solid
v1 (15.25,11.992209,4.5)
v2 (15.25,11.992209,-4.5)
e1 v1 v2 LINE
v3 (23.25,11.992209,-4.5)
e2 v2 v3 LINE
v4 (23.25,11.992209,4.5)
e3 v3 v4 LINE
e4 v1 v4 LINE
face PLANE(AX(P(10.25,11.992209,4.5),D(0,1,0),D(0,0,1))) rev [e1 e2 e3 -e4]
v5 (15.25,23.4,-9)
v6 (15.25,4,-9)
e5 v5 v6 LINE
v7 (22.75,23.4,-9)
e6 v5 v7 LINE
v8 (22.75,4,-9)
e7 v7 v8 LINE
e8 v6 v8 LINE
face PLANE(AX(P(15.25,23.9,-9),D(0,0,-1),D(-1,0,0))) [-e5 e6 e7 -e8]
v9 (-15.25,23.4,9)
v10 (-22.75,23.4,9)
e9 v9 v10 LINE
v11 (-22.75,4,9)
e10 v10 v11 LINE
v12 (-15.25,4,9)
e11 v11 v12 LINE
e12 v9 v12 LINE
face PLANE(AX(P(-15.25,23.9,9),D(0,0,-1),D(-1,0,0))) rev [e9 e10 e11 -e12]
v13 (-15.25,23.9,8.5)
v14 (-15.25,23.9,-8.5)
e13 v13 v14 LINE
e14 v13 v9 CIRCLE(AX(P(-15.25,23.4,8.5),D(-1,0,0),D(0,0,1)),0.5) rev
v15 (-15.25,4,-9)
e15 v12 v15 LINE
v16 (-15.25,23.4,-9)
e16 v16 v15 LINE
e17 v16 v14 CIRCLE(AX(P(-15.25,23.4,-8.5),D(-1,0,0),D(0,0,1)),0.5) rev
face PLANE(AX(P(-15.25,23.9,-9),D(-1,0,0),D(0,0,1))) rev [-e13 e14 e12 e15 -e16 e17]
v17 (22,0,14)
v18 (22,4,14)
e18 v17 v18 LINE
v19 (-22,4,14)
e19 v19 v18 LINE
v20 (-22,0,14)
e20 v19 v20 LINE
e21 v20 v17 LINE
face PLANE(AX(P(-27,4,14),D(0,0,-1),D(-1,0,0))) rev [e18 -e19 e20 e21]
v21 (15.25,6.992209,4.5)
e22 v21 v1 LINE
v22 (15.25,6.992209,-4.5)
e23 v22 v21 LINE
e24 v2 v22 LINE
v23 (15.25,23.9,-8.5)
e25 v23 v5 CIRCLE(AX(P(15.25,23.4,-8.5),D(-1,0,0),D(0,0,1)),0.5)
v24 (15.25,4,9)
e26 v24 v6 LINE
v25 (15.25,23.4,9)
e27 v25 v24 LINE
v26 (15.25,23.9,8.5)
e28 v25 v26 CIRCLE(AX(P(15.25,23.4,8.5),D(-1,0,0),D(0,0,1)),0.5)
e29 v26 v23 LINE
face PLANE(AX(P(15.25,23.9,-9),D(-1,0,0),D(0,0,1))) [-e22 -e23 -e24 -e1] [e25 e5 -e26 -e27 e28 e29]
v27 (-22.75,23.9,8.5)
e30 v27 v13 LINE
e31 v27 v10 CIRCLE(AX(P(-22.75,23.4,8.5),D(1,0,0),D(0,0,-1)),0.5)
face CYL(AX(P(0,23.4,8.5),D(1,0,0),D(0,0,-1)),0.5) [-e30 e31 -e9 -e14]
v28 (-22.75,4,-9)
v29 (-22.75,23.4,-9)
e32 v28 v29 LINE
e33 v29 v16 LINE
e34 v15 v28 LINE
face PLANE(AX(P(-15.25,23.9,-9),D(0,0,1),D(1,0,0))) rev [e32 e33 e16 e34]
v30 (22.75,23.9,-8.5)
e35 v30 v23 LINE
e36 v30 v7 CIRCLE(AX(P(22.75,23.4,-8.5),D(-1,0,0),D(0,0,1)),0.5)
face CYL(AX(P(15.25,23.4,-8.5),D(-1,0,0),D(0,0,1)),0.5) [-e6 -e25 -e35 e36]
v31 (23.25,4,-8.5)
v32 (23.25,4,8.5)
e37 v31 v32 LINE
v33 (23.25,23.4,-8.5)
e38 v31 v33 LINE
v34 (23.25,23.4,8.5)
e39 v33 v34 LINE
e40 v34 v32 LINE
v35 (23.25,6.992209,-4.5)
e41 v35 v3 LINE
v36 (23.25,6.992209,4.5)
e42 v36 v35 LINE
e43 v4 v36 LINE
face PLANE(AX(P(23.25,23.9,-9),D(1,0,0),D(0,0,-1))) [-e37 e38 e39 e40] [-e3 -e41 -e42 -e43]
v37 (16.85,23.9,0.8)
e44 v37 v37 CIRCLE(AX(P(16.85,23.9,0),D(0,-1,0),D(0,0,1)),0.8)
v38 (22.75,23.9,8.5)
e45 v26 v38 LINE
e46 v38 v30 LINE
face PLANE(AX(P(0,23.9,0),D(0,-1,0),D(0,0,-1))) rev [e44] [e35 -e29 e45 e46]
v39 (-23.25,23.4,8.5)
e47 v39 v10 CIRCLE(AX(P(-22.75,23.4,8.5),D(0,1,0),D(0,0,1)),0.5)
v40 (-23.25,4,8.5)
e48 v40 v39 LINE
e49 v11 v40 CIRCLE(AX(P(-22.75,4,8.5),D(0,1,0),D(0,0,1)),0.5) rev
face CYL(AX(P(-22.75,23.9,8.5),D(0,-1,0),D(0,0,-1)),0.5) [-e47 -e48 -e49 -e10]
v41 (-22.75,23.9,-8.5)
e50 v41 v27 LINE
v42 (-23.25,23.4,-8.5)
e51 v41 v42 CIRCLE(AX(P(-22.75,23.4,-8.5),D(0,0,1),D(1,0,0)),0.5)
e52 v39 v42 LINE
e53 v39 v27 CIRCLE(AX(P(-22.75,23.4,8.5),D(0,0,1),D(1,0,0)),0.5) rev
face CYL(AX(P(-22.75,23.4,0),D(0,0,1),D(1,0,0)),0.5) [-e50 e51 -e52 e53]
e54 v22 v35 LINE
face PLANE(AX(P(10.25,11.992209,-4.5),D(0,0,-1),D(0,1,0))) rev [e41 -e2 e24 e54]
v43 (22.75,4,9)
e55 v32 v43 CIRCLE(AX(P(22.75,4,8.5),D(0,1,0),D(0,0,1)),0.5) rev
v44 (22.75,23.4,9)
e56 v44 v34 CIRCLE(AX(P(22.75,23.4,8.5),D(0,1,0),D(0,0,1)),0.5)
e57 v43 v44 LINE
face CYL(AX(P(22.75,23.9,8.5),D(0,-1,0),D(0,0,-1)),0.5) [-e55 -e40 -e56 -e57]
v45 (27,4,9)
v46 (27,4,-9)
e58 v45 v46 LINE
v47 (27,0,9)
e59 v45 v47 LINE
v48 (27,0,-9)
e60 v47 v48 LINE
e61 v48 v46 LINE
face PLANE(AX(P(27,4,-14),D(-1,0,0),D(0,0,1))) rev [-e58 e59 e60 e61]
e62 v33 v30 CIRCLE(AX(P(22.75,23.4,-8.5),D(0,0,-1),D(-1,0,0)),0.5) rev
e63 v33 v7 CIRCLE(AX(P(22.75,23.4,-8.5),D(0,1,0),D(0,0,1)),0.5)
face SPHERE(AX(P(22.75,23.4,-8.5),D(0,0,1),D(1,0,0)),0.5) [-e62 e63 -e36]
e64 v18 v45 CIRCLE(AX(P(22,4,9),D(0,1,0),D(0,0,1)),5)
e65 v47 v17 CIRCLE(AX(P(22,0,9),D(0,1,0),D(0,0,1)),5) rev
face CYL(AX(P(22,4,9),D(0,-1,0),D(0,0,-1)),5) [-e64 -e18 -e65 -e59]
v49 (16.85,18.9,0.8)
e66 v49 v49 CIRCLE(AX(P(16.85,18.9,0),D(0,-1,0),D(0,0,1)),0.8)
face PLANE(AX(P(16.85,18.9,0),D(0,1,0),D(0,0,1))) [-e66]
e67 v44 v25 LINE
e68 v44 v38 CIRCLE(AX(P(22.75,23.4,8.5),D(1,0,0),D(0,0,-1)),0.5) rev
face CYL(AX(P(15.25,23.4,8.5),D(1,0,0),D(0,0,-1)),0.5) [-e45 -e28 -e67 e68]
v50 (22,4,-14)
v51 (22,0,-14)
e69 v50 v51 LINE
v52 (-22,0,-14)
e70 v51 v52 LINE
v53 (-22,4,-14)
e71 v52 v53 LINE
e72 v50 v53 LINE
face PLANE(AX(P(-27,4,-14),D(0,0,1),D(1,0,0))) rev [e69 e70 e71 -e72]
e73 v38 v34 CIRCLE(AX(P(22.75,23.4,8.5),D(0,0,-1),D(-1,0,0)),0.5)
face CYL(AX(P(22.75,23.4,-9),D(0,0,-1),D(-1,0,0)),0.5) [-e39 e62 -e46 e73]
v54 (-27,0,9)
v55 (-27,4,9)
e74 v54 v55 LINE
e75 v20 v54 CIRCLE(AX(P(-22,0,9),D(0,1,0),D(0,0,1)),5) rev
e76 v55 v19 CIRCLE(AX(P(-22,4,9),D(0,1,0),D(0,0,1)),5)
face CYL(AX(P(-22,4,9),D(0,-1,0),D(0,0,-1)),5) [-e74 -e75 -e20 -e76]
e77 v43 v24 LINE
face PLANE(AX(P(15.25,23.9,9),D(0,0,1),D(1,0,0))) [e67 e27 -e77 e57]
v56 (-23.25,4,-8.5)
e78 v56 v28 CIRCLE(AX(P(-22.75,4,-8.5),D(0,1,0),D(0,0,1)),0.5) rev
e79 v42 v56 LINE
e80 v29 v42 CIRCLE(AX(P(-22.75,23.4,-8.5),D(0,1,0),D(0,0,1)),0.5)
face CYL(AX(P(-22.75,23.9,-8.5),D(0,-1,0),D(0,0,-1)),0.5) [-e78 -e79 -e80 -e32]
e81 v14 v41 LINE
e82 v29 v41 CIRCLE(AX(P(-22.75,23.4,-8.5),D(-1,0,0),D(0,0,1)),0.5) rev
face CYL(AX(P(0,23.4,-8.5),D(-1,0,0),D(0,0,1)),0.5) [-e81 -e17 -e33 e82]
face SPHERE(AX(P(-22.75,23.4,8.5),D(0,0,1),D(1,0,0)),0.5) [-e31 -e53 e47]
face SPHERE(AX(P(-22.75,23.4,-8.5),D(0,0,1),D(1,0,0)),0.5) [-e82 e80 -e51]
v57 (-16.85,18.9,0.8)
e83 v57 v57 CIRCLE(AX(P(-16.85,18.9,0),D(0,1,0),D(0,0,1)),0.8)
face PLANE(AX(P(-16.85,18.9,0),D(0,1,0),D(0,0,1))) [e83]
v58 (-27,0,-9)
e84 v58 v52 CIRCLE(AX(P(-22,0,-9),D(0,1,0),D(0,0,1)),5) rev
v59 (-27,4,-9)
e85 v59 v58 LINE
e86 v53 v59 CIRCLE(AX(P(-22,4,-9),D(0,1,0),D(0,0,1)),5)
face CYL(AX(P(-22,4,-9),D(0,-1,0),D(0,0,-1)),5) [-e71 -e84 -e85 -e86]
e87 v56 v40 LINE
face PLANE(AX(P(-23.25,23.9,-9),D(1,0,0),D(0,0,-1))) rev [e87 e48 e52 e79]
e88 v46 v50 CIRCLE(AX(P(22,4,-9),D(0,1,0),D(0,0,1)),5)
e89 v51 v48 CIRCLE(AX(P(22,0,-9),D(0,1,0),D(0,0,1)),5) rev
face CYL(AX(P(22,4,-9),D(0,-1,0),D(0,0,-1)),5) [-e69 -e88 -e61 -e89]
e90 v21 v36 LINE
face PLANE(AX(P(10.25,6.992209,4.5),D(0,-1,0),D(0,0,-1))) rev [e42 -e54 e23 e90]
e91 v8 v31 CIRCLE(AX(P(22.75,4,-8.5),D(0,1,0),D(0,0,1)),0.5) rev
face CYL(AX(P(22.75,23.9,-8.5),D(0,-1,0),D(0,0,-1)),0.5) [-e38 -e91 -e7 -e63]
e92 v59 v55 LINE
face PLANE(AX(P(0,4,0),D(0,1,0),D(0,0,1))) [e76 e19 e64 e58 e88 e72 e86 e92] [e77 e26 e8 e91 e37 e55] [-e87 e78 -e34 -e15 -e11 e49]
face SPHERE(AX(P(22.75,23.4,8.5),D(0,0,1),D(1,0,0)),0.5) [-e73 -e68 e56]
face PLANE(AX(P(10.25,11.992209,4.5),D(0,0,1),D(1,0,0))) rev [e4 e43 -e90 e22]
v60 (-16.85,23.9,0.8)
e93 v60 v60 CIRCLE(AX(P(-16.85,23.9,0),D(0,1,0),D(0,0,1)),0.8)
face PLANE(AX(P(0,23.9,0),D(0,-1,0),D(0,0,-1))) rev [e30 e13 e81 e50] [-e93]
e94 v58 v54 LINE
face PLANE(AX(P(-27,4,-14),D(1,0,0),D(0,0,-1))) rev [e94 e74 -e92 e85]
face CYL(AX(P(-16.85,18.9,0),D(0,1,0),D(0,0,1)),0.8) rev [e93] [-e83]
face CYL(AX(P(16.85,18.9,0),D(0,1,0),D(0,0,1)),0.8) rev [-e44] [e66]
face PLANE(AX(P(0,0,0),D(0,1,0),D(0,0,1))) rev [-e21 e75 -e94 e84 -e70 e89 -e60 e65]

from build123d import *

# Parameters (mm, degrees)
SKETCH1_W           = 54
SKETCH1_H           = 28
BOSS_EXTRUDE1_DEPTH = 4
SKETCH4_W           = 8
SKETCH4_H           = 18
BOSS_EXTRUDE3_DEPTH = 19.9
FILLET1_R           = 5
SKETCH5_R           = 0.8
CUT_EXTRUDE1_DEPTH  = 5
SKETCH6_W           = 9
SKETCH6_H           = 5
CUT_EXTRUDE2_DEPTH  = 13
FILLET4_R           = 0.5
FILLET5_R           = 0.5


with BuildPart() as part:
    # Sketch1 → Boss-Extrude1 (new body)
    with BuildSketch(Plane(origin=(0, 0, 0), x_dir=(1, 0, 0), z_dir=(0, 1, 0))):
        Rectangle(SKETCH1_W, SKETCH1_H)
    extrude(amount=BOSS_EXTRUDE1_DEPTH)

    # Sketch4 → Boss-Extrude3 (add)
    with BuildSketch(Plane(origin=(0, 4, 0), x_dir=(1, 0, 0), z_dir=(0, 1, 0))):
        with Locations((-19.25, 0)):
            Rectangle(SKETCH4_W, SKETCH4_H)
    boss_extrude3 = extrude(amount=BOSS_EXTRUDE3_DEPTH)

    # Mirror2: Boss-Extrude3 across plane
    add(boss_extrude3.mirror(Plane(origin=(0, 0, 0), x_dir=(0, 0, 1), z_dir=(1, 0, 0))))

    # Fillet1
    fillet1_edges = [part.edges().sort_by_distance(p)[0] for p in [
        (27, 2, 14),
        (-27, 2, 14),
        (-27, 2, -14),
        (27, 2, -14),
    ]]
    fillet(fillet1_edges, radius=FILLET1_R)

    # Sketch5 → Cut-Extrude1 (cut)
    with BuildSketch(Plane(origin=(0, 23.9, 0), x_dir=(1, 0, 0), z_dir=(0, 1, 0))):
        with Locations(Location((-16.85, 0, 0), (0, 0, 270))):
            Circle(SKETCH5_R)
    cut_extrude1 = extrude(amount=-CUT_EXTRUDE1_DEPTH, mode=Mode.SUBTRACT)

    # Mirror3: Cut-Extrude1 across plane
    add(cut_extrude1.mirror(Plane(origin=(0, 0, 0), x_dir=(0, 0, 1), z_dir=(1, 0, 0))), mode=Mode.SUBTRACT)

    # Sketch6 → Cut-Extrude2 (cut)
    with BuildSketch(Plane(origin=(23.25, 0, 0), x_dir=(0, 0, -1), z_dir=(1, 0, 0))):
        with Locations((0, 9.492209163)):
            Rectangle(SKETCH6_W, SKETCH6_H)
    extrude(amount=-CUT_EXTRUDE2_DEPTH, mode=Mode.SUBTRACT)

    # Fillet4
    fillet4_edges = [part.edges().sort_by_distance(p)[0] for p in [
        (-19.25, 23.9, -9),
        (-23.25, 23.9, 0),
        (-19.25, 23.9, 9),
        (19.25, 23.9, 9),
        (23.25, 23.9, 0),
        (19.25, 23.9, -9),
    ]]
    fillet(fillet4_edges, radius=FILLET4_R)

    # Fillet5
    # the kernel refuses this fillet: 0.5 mm, written as the material it takes off along each edge
    with BuildSketch(Plane(origin=(-22.75, 23.4, 8.5), x_dir=(-1, 0, 0), z_dir=(0, 0, 1))) as fillet5_piece_1_section:
        Polygon((0, 0), (FILLET5_R, 0), (FILLET5_R, -FILLET5_R), (0, -FILLET5_R), align=None)
    fillet5_piece_1 = extrude(amount=FILLET5_R, mode=Mode.PRIVATE)
    fillet5_piece_1 = fillet5_piece_1 - Plane(origin=(-22.75, 23.4, 8.5), x_dir=(0.7071067811865475, -0.7071067811865475, 0), z_dir=(0, 0, 1)) * Sphere(FILLET5_R, mode=Mode.PRIVATE)
    add(fillet5_piece_1, mode=Mode.SUBTRACT)
    with BuildSketch(Plane(origin=(-22.75, 23.4, -8.5), x_dir=(-1, 0, 0), z_dir=(0, 0, -1))) as fillet5_piece_2_section:
        Polygon((0, 0), (FILLET5_R, 0), (FILLET5_R, FILLET5_R), (0, FILLET5_R), align=None)
    fillet5_piece_2 = extrude(amount=FILLET5_R, mode=Mode.PRIVATE)
    fillet5_piece_2 = fillet5_piece_2 - Plane(origin=(-22.75, 23.4, -8.5), x_dir=(0.7071067811865475, -0.7071067811865475, 0), z_dir=(0, 0, -1)) * Sphere(FILLET5_R, mode=Mode.PRIVATE)
    add(fillet5_piece_2, mode=Mode.SUBTRACT)
    with BuildSketch(Plane(origin=(22.75, 23.4, -8.5), x_dir=(1, 0, 0), z_dir=(0, 0, -1))) as fillet5_piece_3_section:
        Polygon((0, 0), (FILLET5_R, 0), (FILLET5_R, -FILLET5_R), (0, -FILLET5_R), align=None)
    fillet5_piece_3 = extrude(amount=FILLET5_R, mode=Mode.PRIVATE)
    fillet5_piece_3 = fillet5_piece_3 - Plane(origin=(22.75, 23.4, -8.5), x_dir=(-0.7071067811865475, -0.7071067811865475, 0), z_dir=(0, 0, -1)) * Sphere(FILLET5_R, mode=Mode.PRIVATE)
    add(fillet5_piece_3, mode=Mode.SUBTRACT)
    with BuildSketch(Plane(origin=(22.75, 23.4, 8.5), x_dir=(0, 0, 1), z_dir=(1, 0, 0))) as fillet5_piece_4_section:
        Polygon((0, 0), (FILLET5_R, 0), (FILLET5_R, -FILLET5_R), (0, -FILLET5_R), align=None)
    fillet5_piece_4 = extrude(amount=FILLET5_R, mode=Mode.PRIVATE)
    fillet5_piece_4 = fillet5_piece_4 - Plane(origin=(22.75, 23.4, 8.5), x_dir=(0, -0.7071067811865475, -0.7071067811865475), z_dir=(1, 0, 0)) * Sphere(FILLET5_R, mode=Mode.PRIVATE)
    add(fillet5_piece_4, mode=Mode.SUBTRACT)
    with BuildSketch(Plane(origin=(-23.25, 4, -9), x_dir=(1, 0, 0), z_dir=(0, 1, 0))) as fillet5_piece_5:
        with BuildLine():
            CenterArc((FILLET5_R, -FILLET5_R), FILLET5_R, 90, 90)
            Line((0, -FILLET5_R), (0, 0))
            Line((0, 0), (FILLET5_R, 0))
        make_face()
    extrude(amount=19.4, mode=Mode.SUBTRACT)
    with BuildSketch(Plane(origin=(-23.25, 4, 9), x_dir=(1, 0, 0), z_dir=(0, 1, 0)), Plane(origin=(23.25, 4, 9), x_dir=(0, 0, -1), z_dir=(0, 1, 0)), Plane(origin=(23.25, 4, -9), x_dir=(-1, 0, 0), z_dir=(0, 1, 0))) as fillet5_piece_6:
        with BuildLine():
            CenterArc((FILLET5_R, FILLET5_R), FILLET5_R, 180, 90)
            Line((0, FILLET5_R), (0, 0))
            Line((0, 0), (FILLET5_R, 0))
        make_face()
    extrude(amount=19.4, mode=Mode.SUBTRACT)


solid = part.part
